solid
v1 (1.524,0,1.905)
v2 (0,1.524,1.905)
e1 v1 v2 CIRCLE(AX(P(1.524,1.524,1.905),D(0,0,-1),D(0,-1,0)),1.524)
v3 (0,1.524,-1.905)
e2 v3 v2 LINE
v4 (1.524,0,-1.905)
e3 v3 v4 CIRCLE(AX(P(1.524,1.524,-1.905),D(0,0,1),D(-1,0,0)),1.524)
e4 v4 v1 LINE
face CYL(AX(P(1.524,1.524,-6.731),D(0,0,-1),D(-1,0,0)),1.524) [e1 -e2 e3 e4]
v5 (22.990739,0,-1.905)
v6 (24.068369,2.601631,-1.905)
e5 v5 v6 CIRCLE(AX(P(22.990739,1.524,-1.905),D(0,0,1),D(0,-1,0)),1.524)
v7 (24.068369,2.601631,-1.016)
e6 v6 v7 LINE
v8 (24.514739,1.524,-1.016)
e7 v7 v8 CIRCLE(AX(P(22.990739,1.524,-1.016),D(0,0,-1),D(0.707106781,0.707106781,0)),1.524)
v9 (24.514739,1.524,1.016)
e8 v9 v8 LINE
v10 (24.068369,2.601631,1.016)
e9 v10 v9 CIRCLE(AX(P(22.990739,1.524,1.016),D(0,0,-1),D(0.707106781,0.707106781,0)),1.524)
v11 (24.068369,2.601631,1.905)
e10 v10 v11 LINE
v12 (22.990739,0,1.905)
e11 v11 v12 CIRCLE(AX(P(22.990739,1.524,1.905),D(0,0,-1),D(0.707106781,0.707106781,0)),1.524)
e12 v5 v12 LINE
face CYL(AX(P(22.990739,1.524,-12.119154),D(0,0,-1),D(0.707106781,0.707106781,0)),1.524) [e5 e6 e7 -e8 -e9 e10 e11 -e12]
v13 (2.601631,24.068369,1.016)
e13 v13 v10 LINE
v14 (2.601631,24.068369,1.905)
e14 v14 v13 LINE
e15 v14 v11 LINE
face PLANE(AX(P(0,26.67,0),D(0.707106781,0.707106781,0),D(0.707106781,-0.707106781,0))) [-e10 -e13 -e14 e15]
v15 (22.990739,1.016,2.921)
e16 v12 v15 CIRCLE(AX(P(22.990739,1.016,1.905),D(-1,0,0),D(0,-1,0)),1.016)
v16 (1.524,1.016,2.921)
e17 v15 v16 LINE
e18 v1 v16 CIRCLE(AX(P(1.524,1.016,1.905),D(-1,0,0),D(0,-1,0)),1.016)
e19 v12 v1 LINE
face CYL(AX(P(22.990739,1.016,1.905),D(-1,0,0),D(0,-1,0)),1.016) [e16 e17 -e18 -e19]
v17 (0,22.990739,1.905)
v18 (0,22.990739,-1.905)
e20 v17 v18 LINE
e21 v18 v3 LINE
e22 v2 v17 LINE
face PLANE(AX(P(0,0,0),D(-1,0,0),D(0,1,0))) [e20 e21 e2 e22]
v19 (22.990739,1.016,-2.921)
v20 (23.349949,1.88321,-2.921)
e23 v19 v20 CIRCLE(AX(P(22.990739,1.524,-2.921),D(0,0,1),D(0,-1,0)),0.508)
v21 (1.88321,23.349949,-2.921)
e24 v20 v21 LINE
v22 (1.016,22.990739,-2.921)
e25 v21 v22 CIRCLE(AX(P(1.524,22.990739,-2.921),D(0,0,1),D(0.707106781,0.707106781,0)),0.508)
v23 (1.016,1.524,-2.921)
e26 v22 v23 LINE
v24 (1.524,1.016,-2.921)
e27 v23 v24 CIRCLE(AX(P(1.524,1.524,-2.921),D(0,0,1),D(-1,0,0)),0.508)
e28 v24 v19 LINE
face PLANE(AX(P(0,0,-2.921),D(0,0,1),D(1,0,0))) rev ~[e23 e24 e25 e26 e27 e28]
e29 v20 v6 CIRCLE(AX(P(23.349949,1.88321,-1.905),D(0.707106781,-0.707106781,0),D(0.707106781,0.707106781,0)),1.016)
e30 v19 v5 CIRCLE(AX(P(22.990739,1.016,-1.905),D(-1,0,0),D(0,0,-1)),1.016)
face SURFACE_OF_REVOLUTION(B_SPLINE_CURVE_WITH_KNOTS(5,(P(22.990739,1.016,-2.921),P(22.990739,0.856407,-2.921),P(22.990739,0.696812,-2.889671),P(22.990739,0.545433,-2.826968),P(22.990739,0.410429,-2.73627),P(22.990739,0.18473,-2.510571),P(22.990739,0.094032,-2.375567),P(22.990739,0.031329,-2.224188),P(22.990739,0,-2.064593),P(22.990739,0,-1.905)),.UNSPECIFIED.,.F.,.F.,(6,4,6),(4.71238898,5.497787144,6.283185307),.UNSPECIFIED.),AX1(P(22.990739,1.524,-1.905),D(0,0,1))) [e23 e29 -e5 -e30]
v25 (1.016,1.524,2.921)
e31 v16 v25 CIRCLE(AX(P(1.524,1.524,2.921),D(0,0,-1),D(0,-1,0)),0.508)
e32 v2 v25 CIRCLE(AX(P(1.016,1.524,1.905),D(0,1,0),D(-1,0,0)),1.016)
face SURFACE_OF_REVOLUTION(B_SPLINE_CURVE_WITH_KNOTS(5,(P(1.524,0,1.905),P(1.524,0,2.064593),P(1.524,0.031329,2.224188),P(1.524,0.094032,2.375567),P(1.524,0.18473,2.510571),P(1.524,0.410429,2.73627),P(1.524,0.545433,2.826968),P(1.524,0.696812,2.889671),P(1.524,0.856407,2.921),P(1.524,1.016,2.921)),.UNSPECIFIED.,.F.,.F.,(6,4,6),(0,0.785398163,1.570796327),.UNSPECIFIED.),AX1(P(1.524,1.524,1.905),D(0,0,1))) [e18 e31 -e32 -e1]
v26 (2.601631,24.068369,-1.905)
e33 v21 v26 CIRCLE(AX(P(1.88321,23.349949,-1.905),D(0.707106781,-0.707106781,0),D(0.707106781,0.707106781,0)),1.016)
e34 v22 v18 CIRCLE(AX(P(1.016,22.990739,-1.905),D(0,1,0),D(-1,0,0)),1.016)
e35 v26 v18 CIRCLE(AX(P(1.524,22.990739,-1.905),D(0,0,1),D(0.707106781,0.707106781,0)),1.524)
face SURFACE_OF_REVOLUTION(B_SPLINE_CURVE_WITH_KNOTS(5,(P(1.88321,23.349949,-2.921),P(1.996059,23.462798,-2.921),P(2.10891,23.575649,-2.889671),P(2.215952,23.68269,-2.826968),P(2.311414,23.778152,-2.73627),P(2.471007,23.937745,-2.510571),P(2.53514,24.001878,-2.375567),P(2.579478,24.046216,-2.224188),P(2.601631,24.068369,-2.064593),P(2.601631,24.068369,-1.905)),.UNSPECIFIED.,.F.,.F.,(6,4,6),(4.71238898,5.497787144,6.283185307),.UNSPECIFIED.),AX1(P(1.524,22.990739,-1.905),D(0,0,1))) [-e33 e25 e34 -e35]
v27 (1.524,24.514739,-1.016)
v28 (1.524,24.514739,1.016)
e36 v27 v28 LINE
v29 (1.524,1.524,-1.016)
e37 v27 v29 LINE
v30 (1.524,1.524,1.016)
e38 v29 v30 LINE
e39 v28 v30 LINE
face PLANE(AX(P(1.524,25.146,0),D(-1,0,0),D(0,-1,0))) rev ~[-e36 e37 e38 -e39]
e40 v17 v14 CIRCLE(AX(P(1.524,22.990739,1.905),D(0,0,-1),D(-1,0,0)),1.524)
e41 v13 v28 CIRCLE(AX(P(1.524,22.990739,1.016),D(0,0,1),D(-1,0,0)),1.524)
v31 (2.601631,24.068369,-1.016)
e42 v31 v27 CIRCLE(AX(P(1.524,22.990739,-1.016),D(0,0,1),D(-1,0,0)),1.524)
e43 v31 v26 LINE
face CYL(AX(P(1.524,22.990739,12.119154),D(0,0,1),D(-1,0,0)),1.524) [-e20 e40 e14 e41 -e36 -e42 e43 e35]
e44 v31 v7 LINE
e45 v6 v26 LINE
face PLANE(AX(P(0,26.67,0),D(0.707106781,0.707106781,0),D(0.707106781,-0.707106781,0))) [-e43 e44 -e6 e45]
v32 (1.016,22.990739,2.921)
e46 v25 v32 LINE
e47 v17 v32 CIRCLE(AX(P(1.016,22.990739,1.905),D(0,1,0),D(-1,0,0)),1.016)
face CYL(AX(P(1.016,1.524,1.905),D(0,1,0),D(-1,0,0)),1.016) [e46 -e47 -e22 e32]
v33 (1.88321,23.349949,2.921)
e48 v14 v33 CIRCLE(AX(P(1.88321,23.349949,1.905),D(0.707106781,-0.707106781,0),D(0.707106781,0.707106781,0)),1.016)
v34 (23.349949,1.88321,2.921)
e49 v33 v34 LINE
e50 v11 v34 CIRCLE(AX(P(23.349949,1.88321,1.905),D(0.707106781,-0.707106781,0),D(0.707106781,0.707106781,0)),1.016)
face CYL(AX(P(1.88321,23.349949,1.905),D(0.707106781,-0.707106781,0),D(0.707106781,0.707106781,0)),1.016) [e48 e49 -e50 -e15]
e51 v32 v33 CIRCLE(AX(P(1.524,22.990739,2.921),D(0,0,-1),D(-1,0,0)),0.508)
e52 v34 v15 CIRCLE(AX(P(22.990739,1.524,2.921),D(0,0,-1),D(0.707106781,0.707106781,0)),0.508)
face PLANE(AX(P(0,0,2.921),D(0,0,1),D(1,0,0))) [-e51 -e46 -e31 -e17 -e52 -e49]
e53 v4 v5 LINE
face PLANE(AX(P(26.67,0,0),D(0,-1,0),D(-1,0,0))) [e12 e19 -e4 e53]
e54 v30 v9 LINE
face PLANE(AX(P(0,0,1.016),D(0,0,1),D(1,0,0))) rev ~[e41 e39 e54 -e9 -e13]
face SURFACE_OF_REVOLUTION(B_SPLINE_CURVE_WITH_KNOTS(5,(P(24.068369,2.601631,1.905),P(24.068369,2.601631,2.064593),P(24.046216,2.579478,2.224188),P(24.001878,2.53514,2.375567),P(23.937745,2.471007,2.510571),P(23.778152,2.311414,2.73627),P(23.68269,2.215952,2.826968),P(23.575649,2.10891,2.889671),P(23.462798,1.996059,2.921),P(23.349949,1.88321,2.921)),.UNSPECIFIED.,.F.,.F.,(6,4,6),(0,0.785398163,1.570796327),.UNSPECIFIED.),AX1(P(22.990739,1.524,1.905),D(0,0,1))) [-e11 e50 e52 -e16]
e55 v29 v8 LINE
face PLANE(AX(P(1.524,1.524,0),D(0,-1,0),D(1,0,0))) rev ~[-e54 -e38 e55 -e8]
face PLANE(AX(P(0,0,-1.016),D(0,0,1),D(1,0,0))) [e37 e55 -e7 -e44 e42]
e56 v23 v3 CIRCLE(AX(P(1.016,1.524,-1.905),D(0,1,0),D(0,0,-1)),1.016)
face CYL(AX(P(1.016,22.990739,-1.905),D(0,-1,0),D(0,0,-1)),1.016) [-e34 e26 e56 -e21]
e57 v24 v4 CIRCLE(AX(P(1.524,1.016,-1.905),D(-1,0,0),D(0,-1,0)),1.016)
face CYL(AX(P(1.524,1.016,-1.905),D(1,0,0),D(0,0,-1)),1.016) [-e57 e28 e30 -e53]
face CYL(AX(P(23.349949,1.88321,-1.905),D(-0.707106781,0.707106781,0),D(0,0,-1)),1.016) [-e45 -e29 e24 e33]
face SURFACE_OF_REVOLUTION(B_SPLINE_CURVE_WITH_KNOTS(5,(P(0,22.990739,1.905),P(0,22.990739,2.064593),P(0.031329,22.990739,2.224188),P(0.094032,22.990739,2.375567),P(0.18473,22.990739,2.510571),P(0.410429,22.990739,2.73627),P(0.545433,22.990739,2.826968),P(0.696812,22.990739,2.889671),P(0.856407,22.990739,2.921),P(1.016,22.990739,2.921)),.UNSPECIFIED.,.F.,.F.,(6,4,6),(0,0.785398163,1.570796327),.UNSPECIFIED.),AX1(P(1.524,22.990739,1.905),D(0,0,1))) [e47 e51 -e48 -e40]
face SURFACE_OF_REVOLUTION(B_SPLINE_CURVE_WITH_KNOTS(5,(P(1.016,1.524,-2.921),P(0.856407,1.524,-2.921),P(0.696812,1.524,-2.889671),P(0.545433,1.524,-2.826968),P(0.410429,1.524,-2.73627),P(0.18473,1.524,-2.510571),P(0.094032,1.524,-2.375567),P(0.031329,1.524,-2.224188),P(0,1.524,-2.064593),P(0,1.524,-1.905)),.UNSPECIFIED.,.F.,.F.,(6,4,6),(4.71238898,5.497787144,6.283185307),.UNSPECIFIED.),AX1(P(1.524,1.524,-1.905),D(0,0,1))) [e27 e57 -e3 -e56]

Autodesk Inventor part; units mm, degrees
ref_plane "YZ Plane" through (0, 0, 0) normal (1, 0, 0) x (0, 1, 0)
ref_plane "XZ Plane" through (0, 0, 0) normal (0, 1, 0) x (-1, 0, 0)
ref_plane "XY Plane" through (0, 0, 0) normal (0, 0, 1) x (1, 0, 0)
sketch "Sketch1" plane through (0, 0, 0) normal (0, 0, 1) x (1, 0, 0)
  line L0 (0, 0) -> (-13.377, 0)
  line L1 (0, 0) -> (0, 26.67)
  line L2 (0, 26.67) -> (26.67, 0)
  line L3 (26.67, 0) -> (0, 0)
  dimension "d0" = 26.67
extrude "Extrusion1" add sketch "Sketch1" along normal mid plane 5.842
sketch "Sketch3" plane through (0, 0, 0) normal (0, 0, 1) x (1, 0, 0)
  line L0 (0, 26.67) -> (26.67, 0) projected
  line L1 (0, 0) -> (0, 26.67) projected
  line L2 (26.67, 0) -> (0, 0) projected
  line L3 (1.524, 25.146) -> (1.524, 1.524)
  line L4 (1.524, 1.524) -> (25.146, 1.524)
  line L5 (1.524, 25.146) -> (25.146, 1.524)
  dimension "d3" = 1.524
  dimension "d4" = 1.524
extrude "Extrusion2" cut sketch "Sketch3" against normal mid plane 2.032 contours L0 L4 L3
fillet "Fillet1" radius 1.524 3 edges at (0, 26.67, 0) (0, 0, 0) (26.67, 0, 0)
fillet "Fillet2" radius 1.016 6 edges at (0.4464, 0.4464, 2.921) (12.2574, 0, 2.921) (24.3987, 0.9408, 2.921) (13.335, 13.335, 2.921) (0.9408, 24.3987, 2.921) (0, 12.2574, 2.921)
fillet "Fillet3" radius 1.016 6 edges at (0.9408, 24.3987, -2.921) (13.335, 13.335, -2.921) (24.3987, 0.9408, -2.921) (12.2574, 0, -2.921) (0.4464, 0.4464, -2.921) (0, 12.2574, -2.921)
equation "\"d0\" = edgeSize"
equation "\"d1\" = partThickness"
equation "\"d3\" = edgeThickness"
equation "\"d4\" = edgeThickness"
equation "\"d5\" = mirrorThickness"
equation "\"d7\" = filetForCorners"
equation "\"d8\" = filetForFlat"
equation "\"d9\" = filetForFlat"
equation "\"edgeSize\" = 26.67"
equation "\"wallThickness\" = 1.905"
equation "\"mirrorThickness\" = 2.032"
equation "\"partThickness\" = mirrorThickness + 2 * wallThickness"
equation "\"edgeThickness\" = 1.524"
equation "\"filetForCorners\" = 1.524"
equation "\"filetForFlat\" = 1.016"
properties part number "Mirror Corner"
